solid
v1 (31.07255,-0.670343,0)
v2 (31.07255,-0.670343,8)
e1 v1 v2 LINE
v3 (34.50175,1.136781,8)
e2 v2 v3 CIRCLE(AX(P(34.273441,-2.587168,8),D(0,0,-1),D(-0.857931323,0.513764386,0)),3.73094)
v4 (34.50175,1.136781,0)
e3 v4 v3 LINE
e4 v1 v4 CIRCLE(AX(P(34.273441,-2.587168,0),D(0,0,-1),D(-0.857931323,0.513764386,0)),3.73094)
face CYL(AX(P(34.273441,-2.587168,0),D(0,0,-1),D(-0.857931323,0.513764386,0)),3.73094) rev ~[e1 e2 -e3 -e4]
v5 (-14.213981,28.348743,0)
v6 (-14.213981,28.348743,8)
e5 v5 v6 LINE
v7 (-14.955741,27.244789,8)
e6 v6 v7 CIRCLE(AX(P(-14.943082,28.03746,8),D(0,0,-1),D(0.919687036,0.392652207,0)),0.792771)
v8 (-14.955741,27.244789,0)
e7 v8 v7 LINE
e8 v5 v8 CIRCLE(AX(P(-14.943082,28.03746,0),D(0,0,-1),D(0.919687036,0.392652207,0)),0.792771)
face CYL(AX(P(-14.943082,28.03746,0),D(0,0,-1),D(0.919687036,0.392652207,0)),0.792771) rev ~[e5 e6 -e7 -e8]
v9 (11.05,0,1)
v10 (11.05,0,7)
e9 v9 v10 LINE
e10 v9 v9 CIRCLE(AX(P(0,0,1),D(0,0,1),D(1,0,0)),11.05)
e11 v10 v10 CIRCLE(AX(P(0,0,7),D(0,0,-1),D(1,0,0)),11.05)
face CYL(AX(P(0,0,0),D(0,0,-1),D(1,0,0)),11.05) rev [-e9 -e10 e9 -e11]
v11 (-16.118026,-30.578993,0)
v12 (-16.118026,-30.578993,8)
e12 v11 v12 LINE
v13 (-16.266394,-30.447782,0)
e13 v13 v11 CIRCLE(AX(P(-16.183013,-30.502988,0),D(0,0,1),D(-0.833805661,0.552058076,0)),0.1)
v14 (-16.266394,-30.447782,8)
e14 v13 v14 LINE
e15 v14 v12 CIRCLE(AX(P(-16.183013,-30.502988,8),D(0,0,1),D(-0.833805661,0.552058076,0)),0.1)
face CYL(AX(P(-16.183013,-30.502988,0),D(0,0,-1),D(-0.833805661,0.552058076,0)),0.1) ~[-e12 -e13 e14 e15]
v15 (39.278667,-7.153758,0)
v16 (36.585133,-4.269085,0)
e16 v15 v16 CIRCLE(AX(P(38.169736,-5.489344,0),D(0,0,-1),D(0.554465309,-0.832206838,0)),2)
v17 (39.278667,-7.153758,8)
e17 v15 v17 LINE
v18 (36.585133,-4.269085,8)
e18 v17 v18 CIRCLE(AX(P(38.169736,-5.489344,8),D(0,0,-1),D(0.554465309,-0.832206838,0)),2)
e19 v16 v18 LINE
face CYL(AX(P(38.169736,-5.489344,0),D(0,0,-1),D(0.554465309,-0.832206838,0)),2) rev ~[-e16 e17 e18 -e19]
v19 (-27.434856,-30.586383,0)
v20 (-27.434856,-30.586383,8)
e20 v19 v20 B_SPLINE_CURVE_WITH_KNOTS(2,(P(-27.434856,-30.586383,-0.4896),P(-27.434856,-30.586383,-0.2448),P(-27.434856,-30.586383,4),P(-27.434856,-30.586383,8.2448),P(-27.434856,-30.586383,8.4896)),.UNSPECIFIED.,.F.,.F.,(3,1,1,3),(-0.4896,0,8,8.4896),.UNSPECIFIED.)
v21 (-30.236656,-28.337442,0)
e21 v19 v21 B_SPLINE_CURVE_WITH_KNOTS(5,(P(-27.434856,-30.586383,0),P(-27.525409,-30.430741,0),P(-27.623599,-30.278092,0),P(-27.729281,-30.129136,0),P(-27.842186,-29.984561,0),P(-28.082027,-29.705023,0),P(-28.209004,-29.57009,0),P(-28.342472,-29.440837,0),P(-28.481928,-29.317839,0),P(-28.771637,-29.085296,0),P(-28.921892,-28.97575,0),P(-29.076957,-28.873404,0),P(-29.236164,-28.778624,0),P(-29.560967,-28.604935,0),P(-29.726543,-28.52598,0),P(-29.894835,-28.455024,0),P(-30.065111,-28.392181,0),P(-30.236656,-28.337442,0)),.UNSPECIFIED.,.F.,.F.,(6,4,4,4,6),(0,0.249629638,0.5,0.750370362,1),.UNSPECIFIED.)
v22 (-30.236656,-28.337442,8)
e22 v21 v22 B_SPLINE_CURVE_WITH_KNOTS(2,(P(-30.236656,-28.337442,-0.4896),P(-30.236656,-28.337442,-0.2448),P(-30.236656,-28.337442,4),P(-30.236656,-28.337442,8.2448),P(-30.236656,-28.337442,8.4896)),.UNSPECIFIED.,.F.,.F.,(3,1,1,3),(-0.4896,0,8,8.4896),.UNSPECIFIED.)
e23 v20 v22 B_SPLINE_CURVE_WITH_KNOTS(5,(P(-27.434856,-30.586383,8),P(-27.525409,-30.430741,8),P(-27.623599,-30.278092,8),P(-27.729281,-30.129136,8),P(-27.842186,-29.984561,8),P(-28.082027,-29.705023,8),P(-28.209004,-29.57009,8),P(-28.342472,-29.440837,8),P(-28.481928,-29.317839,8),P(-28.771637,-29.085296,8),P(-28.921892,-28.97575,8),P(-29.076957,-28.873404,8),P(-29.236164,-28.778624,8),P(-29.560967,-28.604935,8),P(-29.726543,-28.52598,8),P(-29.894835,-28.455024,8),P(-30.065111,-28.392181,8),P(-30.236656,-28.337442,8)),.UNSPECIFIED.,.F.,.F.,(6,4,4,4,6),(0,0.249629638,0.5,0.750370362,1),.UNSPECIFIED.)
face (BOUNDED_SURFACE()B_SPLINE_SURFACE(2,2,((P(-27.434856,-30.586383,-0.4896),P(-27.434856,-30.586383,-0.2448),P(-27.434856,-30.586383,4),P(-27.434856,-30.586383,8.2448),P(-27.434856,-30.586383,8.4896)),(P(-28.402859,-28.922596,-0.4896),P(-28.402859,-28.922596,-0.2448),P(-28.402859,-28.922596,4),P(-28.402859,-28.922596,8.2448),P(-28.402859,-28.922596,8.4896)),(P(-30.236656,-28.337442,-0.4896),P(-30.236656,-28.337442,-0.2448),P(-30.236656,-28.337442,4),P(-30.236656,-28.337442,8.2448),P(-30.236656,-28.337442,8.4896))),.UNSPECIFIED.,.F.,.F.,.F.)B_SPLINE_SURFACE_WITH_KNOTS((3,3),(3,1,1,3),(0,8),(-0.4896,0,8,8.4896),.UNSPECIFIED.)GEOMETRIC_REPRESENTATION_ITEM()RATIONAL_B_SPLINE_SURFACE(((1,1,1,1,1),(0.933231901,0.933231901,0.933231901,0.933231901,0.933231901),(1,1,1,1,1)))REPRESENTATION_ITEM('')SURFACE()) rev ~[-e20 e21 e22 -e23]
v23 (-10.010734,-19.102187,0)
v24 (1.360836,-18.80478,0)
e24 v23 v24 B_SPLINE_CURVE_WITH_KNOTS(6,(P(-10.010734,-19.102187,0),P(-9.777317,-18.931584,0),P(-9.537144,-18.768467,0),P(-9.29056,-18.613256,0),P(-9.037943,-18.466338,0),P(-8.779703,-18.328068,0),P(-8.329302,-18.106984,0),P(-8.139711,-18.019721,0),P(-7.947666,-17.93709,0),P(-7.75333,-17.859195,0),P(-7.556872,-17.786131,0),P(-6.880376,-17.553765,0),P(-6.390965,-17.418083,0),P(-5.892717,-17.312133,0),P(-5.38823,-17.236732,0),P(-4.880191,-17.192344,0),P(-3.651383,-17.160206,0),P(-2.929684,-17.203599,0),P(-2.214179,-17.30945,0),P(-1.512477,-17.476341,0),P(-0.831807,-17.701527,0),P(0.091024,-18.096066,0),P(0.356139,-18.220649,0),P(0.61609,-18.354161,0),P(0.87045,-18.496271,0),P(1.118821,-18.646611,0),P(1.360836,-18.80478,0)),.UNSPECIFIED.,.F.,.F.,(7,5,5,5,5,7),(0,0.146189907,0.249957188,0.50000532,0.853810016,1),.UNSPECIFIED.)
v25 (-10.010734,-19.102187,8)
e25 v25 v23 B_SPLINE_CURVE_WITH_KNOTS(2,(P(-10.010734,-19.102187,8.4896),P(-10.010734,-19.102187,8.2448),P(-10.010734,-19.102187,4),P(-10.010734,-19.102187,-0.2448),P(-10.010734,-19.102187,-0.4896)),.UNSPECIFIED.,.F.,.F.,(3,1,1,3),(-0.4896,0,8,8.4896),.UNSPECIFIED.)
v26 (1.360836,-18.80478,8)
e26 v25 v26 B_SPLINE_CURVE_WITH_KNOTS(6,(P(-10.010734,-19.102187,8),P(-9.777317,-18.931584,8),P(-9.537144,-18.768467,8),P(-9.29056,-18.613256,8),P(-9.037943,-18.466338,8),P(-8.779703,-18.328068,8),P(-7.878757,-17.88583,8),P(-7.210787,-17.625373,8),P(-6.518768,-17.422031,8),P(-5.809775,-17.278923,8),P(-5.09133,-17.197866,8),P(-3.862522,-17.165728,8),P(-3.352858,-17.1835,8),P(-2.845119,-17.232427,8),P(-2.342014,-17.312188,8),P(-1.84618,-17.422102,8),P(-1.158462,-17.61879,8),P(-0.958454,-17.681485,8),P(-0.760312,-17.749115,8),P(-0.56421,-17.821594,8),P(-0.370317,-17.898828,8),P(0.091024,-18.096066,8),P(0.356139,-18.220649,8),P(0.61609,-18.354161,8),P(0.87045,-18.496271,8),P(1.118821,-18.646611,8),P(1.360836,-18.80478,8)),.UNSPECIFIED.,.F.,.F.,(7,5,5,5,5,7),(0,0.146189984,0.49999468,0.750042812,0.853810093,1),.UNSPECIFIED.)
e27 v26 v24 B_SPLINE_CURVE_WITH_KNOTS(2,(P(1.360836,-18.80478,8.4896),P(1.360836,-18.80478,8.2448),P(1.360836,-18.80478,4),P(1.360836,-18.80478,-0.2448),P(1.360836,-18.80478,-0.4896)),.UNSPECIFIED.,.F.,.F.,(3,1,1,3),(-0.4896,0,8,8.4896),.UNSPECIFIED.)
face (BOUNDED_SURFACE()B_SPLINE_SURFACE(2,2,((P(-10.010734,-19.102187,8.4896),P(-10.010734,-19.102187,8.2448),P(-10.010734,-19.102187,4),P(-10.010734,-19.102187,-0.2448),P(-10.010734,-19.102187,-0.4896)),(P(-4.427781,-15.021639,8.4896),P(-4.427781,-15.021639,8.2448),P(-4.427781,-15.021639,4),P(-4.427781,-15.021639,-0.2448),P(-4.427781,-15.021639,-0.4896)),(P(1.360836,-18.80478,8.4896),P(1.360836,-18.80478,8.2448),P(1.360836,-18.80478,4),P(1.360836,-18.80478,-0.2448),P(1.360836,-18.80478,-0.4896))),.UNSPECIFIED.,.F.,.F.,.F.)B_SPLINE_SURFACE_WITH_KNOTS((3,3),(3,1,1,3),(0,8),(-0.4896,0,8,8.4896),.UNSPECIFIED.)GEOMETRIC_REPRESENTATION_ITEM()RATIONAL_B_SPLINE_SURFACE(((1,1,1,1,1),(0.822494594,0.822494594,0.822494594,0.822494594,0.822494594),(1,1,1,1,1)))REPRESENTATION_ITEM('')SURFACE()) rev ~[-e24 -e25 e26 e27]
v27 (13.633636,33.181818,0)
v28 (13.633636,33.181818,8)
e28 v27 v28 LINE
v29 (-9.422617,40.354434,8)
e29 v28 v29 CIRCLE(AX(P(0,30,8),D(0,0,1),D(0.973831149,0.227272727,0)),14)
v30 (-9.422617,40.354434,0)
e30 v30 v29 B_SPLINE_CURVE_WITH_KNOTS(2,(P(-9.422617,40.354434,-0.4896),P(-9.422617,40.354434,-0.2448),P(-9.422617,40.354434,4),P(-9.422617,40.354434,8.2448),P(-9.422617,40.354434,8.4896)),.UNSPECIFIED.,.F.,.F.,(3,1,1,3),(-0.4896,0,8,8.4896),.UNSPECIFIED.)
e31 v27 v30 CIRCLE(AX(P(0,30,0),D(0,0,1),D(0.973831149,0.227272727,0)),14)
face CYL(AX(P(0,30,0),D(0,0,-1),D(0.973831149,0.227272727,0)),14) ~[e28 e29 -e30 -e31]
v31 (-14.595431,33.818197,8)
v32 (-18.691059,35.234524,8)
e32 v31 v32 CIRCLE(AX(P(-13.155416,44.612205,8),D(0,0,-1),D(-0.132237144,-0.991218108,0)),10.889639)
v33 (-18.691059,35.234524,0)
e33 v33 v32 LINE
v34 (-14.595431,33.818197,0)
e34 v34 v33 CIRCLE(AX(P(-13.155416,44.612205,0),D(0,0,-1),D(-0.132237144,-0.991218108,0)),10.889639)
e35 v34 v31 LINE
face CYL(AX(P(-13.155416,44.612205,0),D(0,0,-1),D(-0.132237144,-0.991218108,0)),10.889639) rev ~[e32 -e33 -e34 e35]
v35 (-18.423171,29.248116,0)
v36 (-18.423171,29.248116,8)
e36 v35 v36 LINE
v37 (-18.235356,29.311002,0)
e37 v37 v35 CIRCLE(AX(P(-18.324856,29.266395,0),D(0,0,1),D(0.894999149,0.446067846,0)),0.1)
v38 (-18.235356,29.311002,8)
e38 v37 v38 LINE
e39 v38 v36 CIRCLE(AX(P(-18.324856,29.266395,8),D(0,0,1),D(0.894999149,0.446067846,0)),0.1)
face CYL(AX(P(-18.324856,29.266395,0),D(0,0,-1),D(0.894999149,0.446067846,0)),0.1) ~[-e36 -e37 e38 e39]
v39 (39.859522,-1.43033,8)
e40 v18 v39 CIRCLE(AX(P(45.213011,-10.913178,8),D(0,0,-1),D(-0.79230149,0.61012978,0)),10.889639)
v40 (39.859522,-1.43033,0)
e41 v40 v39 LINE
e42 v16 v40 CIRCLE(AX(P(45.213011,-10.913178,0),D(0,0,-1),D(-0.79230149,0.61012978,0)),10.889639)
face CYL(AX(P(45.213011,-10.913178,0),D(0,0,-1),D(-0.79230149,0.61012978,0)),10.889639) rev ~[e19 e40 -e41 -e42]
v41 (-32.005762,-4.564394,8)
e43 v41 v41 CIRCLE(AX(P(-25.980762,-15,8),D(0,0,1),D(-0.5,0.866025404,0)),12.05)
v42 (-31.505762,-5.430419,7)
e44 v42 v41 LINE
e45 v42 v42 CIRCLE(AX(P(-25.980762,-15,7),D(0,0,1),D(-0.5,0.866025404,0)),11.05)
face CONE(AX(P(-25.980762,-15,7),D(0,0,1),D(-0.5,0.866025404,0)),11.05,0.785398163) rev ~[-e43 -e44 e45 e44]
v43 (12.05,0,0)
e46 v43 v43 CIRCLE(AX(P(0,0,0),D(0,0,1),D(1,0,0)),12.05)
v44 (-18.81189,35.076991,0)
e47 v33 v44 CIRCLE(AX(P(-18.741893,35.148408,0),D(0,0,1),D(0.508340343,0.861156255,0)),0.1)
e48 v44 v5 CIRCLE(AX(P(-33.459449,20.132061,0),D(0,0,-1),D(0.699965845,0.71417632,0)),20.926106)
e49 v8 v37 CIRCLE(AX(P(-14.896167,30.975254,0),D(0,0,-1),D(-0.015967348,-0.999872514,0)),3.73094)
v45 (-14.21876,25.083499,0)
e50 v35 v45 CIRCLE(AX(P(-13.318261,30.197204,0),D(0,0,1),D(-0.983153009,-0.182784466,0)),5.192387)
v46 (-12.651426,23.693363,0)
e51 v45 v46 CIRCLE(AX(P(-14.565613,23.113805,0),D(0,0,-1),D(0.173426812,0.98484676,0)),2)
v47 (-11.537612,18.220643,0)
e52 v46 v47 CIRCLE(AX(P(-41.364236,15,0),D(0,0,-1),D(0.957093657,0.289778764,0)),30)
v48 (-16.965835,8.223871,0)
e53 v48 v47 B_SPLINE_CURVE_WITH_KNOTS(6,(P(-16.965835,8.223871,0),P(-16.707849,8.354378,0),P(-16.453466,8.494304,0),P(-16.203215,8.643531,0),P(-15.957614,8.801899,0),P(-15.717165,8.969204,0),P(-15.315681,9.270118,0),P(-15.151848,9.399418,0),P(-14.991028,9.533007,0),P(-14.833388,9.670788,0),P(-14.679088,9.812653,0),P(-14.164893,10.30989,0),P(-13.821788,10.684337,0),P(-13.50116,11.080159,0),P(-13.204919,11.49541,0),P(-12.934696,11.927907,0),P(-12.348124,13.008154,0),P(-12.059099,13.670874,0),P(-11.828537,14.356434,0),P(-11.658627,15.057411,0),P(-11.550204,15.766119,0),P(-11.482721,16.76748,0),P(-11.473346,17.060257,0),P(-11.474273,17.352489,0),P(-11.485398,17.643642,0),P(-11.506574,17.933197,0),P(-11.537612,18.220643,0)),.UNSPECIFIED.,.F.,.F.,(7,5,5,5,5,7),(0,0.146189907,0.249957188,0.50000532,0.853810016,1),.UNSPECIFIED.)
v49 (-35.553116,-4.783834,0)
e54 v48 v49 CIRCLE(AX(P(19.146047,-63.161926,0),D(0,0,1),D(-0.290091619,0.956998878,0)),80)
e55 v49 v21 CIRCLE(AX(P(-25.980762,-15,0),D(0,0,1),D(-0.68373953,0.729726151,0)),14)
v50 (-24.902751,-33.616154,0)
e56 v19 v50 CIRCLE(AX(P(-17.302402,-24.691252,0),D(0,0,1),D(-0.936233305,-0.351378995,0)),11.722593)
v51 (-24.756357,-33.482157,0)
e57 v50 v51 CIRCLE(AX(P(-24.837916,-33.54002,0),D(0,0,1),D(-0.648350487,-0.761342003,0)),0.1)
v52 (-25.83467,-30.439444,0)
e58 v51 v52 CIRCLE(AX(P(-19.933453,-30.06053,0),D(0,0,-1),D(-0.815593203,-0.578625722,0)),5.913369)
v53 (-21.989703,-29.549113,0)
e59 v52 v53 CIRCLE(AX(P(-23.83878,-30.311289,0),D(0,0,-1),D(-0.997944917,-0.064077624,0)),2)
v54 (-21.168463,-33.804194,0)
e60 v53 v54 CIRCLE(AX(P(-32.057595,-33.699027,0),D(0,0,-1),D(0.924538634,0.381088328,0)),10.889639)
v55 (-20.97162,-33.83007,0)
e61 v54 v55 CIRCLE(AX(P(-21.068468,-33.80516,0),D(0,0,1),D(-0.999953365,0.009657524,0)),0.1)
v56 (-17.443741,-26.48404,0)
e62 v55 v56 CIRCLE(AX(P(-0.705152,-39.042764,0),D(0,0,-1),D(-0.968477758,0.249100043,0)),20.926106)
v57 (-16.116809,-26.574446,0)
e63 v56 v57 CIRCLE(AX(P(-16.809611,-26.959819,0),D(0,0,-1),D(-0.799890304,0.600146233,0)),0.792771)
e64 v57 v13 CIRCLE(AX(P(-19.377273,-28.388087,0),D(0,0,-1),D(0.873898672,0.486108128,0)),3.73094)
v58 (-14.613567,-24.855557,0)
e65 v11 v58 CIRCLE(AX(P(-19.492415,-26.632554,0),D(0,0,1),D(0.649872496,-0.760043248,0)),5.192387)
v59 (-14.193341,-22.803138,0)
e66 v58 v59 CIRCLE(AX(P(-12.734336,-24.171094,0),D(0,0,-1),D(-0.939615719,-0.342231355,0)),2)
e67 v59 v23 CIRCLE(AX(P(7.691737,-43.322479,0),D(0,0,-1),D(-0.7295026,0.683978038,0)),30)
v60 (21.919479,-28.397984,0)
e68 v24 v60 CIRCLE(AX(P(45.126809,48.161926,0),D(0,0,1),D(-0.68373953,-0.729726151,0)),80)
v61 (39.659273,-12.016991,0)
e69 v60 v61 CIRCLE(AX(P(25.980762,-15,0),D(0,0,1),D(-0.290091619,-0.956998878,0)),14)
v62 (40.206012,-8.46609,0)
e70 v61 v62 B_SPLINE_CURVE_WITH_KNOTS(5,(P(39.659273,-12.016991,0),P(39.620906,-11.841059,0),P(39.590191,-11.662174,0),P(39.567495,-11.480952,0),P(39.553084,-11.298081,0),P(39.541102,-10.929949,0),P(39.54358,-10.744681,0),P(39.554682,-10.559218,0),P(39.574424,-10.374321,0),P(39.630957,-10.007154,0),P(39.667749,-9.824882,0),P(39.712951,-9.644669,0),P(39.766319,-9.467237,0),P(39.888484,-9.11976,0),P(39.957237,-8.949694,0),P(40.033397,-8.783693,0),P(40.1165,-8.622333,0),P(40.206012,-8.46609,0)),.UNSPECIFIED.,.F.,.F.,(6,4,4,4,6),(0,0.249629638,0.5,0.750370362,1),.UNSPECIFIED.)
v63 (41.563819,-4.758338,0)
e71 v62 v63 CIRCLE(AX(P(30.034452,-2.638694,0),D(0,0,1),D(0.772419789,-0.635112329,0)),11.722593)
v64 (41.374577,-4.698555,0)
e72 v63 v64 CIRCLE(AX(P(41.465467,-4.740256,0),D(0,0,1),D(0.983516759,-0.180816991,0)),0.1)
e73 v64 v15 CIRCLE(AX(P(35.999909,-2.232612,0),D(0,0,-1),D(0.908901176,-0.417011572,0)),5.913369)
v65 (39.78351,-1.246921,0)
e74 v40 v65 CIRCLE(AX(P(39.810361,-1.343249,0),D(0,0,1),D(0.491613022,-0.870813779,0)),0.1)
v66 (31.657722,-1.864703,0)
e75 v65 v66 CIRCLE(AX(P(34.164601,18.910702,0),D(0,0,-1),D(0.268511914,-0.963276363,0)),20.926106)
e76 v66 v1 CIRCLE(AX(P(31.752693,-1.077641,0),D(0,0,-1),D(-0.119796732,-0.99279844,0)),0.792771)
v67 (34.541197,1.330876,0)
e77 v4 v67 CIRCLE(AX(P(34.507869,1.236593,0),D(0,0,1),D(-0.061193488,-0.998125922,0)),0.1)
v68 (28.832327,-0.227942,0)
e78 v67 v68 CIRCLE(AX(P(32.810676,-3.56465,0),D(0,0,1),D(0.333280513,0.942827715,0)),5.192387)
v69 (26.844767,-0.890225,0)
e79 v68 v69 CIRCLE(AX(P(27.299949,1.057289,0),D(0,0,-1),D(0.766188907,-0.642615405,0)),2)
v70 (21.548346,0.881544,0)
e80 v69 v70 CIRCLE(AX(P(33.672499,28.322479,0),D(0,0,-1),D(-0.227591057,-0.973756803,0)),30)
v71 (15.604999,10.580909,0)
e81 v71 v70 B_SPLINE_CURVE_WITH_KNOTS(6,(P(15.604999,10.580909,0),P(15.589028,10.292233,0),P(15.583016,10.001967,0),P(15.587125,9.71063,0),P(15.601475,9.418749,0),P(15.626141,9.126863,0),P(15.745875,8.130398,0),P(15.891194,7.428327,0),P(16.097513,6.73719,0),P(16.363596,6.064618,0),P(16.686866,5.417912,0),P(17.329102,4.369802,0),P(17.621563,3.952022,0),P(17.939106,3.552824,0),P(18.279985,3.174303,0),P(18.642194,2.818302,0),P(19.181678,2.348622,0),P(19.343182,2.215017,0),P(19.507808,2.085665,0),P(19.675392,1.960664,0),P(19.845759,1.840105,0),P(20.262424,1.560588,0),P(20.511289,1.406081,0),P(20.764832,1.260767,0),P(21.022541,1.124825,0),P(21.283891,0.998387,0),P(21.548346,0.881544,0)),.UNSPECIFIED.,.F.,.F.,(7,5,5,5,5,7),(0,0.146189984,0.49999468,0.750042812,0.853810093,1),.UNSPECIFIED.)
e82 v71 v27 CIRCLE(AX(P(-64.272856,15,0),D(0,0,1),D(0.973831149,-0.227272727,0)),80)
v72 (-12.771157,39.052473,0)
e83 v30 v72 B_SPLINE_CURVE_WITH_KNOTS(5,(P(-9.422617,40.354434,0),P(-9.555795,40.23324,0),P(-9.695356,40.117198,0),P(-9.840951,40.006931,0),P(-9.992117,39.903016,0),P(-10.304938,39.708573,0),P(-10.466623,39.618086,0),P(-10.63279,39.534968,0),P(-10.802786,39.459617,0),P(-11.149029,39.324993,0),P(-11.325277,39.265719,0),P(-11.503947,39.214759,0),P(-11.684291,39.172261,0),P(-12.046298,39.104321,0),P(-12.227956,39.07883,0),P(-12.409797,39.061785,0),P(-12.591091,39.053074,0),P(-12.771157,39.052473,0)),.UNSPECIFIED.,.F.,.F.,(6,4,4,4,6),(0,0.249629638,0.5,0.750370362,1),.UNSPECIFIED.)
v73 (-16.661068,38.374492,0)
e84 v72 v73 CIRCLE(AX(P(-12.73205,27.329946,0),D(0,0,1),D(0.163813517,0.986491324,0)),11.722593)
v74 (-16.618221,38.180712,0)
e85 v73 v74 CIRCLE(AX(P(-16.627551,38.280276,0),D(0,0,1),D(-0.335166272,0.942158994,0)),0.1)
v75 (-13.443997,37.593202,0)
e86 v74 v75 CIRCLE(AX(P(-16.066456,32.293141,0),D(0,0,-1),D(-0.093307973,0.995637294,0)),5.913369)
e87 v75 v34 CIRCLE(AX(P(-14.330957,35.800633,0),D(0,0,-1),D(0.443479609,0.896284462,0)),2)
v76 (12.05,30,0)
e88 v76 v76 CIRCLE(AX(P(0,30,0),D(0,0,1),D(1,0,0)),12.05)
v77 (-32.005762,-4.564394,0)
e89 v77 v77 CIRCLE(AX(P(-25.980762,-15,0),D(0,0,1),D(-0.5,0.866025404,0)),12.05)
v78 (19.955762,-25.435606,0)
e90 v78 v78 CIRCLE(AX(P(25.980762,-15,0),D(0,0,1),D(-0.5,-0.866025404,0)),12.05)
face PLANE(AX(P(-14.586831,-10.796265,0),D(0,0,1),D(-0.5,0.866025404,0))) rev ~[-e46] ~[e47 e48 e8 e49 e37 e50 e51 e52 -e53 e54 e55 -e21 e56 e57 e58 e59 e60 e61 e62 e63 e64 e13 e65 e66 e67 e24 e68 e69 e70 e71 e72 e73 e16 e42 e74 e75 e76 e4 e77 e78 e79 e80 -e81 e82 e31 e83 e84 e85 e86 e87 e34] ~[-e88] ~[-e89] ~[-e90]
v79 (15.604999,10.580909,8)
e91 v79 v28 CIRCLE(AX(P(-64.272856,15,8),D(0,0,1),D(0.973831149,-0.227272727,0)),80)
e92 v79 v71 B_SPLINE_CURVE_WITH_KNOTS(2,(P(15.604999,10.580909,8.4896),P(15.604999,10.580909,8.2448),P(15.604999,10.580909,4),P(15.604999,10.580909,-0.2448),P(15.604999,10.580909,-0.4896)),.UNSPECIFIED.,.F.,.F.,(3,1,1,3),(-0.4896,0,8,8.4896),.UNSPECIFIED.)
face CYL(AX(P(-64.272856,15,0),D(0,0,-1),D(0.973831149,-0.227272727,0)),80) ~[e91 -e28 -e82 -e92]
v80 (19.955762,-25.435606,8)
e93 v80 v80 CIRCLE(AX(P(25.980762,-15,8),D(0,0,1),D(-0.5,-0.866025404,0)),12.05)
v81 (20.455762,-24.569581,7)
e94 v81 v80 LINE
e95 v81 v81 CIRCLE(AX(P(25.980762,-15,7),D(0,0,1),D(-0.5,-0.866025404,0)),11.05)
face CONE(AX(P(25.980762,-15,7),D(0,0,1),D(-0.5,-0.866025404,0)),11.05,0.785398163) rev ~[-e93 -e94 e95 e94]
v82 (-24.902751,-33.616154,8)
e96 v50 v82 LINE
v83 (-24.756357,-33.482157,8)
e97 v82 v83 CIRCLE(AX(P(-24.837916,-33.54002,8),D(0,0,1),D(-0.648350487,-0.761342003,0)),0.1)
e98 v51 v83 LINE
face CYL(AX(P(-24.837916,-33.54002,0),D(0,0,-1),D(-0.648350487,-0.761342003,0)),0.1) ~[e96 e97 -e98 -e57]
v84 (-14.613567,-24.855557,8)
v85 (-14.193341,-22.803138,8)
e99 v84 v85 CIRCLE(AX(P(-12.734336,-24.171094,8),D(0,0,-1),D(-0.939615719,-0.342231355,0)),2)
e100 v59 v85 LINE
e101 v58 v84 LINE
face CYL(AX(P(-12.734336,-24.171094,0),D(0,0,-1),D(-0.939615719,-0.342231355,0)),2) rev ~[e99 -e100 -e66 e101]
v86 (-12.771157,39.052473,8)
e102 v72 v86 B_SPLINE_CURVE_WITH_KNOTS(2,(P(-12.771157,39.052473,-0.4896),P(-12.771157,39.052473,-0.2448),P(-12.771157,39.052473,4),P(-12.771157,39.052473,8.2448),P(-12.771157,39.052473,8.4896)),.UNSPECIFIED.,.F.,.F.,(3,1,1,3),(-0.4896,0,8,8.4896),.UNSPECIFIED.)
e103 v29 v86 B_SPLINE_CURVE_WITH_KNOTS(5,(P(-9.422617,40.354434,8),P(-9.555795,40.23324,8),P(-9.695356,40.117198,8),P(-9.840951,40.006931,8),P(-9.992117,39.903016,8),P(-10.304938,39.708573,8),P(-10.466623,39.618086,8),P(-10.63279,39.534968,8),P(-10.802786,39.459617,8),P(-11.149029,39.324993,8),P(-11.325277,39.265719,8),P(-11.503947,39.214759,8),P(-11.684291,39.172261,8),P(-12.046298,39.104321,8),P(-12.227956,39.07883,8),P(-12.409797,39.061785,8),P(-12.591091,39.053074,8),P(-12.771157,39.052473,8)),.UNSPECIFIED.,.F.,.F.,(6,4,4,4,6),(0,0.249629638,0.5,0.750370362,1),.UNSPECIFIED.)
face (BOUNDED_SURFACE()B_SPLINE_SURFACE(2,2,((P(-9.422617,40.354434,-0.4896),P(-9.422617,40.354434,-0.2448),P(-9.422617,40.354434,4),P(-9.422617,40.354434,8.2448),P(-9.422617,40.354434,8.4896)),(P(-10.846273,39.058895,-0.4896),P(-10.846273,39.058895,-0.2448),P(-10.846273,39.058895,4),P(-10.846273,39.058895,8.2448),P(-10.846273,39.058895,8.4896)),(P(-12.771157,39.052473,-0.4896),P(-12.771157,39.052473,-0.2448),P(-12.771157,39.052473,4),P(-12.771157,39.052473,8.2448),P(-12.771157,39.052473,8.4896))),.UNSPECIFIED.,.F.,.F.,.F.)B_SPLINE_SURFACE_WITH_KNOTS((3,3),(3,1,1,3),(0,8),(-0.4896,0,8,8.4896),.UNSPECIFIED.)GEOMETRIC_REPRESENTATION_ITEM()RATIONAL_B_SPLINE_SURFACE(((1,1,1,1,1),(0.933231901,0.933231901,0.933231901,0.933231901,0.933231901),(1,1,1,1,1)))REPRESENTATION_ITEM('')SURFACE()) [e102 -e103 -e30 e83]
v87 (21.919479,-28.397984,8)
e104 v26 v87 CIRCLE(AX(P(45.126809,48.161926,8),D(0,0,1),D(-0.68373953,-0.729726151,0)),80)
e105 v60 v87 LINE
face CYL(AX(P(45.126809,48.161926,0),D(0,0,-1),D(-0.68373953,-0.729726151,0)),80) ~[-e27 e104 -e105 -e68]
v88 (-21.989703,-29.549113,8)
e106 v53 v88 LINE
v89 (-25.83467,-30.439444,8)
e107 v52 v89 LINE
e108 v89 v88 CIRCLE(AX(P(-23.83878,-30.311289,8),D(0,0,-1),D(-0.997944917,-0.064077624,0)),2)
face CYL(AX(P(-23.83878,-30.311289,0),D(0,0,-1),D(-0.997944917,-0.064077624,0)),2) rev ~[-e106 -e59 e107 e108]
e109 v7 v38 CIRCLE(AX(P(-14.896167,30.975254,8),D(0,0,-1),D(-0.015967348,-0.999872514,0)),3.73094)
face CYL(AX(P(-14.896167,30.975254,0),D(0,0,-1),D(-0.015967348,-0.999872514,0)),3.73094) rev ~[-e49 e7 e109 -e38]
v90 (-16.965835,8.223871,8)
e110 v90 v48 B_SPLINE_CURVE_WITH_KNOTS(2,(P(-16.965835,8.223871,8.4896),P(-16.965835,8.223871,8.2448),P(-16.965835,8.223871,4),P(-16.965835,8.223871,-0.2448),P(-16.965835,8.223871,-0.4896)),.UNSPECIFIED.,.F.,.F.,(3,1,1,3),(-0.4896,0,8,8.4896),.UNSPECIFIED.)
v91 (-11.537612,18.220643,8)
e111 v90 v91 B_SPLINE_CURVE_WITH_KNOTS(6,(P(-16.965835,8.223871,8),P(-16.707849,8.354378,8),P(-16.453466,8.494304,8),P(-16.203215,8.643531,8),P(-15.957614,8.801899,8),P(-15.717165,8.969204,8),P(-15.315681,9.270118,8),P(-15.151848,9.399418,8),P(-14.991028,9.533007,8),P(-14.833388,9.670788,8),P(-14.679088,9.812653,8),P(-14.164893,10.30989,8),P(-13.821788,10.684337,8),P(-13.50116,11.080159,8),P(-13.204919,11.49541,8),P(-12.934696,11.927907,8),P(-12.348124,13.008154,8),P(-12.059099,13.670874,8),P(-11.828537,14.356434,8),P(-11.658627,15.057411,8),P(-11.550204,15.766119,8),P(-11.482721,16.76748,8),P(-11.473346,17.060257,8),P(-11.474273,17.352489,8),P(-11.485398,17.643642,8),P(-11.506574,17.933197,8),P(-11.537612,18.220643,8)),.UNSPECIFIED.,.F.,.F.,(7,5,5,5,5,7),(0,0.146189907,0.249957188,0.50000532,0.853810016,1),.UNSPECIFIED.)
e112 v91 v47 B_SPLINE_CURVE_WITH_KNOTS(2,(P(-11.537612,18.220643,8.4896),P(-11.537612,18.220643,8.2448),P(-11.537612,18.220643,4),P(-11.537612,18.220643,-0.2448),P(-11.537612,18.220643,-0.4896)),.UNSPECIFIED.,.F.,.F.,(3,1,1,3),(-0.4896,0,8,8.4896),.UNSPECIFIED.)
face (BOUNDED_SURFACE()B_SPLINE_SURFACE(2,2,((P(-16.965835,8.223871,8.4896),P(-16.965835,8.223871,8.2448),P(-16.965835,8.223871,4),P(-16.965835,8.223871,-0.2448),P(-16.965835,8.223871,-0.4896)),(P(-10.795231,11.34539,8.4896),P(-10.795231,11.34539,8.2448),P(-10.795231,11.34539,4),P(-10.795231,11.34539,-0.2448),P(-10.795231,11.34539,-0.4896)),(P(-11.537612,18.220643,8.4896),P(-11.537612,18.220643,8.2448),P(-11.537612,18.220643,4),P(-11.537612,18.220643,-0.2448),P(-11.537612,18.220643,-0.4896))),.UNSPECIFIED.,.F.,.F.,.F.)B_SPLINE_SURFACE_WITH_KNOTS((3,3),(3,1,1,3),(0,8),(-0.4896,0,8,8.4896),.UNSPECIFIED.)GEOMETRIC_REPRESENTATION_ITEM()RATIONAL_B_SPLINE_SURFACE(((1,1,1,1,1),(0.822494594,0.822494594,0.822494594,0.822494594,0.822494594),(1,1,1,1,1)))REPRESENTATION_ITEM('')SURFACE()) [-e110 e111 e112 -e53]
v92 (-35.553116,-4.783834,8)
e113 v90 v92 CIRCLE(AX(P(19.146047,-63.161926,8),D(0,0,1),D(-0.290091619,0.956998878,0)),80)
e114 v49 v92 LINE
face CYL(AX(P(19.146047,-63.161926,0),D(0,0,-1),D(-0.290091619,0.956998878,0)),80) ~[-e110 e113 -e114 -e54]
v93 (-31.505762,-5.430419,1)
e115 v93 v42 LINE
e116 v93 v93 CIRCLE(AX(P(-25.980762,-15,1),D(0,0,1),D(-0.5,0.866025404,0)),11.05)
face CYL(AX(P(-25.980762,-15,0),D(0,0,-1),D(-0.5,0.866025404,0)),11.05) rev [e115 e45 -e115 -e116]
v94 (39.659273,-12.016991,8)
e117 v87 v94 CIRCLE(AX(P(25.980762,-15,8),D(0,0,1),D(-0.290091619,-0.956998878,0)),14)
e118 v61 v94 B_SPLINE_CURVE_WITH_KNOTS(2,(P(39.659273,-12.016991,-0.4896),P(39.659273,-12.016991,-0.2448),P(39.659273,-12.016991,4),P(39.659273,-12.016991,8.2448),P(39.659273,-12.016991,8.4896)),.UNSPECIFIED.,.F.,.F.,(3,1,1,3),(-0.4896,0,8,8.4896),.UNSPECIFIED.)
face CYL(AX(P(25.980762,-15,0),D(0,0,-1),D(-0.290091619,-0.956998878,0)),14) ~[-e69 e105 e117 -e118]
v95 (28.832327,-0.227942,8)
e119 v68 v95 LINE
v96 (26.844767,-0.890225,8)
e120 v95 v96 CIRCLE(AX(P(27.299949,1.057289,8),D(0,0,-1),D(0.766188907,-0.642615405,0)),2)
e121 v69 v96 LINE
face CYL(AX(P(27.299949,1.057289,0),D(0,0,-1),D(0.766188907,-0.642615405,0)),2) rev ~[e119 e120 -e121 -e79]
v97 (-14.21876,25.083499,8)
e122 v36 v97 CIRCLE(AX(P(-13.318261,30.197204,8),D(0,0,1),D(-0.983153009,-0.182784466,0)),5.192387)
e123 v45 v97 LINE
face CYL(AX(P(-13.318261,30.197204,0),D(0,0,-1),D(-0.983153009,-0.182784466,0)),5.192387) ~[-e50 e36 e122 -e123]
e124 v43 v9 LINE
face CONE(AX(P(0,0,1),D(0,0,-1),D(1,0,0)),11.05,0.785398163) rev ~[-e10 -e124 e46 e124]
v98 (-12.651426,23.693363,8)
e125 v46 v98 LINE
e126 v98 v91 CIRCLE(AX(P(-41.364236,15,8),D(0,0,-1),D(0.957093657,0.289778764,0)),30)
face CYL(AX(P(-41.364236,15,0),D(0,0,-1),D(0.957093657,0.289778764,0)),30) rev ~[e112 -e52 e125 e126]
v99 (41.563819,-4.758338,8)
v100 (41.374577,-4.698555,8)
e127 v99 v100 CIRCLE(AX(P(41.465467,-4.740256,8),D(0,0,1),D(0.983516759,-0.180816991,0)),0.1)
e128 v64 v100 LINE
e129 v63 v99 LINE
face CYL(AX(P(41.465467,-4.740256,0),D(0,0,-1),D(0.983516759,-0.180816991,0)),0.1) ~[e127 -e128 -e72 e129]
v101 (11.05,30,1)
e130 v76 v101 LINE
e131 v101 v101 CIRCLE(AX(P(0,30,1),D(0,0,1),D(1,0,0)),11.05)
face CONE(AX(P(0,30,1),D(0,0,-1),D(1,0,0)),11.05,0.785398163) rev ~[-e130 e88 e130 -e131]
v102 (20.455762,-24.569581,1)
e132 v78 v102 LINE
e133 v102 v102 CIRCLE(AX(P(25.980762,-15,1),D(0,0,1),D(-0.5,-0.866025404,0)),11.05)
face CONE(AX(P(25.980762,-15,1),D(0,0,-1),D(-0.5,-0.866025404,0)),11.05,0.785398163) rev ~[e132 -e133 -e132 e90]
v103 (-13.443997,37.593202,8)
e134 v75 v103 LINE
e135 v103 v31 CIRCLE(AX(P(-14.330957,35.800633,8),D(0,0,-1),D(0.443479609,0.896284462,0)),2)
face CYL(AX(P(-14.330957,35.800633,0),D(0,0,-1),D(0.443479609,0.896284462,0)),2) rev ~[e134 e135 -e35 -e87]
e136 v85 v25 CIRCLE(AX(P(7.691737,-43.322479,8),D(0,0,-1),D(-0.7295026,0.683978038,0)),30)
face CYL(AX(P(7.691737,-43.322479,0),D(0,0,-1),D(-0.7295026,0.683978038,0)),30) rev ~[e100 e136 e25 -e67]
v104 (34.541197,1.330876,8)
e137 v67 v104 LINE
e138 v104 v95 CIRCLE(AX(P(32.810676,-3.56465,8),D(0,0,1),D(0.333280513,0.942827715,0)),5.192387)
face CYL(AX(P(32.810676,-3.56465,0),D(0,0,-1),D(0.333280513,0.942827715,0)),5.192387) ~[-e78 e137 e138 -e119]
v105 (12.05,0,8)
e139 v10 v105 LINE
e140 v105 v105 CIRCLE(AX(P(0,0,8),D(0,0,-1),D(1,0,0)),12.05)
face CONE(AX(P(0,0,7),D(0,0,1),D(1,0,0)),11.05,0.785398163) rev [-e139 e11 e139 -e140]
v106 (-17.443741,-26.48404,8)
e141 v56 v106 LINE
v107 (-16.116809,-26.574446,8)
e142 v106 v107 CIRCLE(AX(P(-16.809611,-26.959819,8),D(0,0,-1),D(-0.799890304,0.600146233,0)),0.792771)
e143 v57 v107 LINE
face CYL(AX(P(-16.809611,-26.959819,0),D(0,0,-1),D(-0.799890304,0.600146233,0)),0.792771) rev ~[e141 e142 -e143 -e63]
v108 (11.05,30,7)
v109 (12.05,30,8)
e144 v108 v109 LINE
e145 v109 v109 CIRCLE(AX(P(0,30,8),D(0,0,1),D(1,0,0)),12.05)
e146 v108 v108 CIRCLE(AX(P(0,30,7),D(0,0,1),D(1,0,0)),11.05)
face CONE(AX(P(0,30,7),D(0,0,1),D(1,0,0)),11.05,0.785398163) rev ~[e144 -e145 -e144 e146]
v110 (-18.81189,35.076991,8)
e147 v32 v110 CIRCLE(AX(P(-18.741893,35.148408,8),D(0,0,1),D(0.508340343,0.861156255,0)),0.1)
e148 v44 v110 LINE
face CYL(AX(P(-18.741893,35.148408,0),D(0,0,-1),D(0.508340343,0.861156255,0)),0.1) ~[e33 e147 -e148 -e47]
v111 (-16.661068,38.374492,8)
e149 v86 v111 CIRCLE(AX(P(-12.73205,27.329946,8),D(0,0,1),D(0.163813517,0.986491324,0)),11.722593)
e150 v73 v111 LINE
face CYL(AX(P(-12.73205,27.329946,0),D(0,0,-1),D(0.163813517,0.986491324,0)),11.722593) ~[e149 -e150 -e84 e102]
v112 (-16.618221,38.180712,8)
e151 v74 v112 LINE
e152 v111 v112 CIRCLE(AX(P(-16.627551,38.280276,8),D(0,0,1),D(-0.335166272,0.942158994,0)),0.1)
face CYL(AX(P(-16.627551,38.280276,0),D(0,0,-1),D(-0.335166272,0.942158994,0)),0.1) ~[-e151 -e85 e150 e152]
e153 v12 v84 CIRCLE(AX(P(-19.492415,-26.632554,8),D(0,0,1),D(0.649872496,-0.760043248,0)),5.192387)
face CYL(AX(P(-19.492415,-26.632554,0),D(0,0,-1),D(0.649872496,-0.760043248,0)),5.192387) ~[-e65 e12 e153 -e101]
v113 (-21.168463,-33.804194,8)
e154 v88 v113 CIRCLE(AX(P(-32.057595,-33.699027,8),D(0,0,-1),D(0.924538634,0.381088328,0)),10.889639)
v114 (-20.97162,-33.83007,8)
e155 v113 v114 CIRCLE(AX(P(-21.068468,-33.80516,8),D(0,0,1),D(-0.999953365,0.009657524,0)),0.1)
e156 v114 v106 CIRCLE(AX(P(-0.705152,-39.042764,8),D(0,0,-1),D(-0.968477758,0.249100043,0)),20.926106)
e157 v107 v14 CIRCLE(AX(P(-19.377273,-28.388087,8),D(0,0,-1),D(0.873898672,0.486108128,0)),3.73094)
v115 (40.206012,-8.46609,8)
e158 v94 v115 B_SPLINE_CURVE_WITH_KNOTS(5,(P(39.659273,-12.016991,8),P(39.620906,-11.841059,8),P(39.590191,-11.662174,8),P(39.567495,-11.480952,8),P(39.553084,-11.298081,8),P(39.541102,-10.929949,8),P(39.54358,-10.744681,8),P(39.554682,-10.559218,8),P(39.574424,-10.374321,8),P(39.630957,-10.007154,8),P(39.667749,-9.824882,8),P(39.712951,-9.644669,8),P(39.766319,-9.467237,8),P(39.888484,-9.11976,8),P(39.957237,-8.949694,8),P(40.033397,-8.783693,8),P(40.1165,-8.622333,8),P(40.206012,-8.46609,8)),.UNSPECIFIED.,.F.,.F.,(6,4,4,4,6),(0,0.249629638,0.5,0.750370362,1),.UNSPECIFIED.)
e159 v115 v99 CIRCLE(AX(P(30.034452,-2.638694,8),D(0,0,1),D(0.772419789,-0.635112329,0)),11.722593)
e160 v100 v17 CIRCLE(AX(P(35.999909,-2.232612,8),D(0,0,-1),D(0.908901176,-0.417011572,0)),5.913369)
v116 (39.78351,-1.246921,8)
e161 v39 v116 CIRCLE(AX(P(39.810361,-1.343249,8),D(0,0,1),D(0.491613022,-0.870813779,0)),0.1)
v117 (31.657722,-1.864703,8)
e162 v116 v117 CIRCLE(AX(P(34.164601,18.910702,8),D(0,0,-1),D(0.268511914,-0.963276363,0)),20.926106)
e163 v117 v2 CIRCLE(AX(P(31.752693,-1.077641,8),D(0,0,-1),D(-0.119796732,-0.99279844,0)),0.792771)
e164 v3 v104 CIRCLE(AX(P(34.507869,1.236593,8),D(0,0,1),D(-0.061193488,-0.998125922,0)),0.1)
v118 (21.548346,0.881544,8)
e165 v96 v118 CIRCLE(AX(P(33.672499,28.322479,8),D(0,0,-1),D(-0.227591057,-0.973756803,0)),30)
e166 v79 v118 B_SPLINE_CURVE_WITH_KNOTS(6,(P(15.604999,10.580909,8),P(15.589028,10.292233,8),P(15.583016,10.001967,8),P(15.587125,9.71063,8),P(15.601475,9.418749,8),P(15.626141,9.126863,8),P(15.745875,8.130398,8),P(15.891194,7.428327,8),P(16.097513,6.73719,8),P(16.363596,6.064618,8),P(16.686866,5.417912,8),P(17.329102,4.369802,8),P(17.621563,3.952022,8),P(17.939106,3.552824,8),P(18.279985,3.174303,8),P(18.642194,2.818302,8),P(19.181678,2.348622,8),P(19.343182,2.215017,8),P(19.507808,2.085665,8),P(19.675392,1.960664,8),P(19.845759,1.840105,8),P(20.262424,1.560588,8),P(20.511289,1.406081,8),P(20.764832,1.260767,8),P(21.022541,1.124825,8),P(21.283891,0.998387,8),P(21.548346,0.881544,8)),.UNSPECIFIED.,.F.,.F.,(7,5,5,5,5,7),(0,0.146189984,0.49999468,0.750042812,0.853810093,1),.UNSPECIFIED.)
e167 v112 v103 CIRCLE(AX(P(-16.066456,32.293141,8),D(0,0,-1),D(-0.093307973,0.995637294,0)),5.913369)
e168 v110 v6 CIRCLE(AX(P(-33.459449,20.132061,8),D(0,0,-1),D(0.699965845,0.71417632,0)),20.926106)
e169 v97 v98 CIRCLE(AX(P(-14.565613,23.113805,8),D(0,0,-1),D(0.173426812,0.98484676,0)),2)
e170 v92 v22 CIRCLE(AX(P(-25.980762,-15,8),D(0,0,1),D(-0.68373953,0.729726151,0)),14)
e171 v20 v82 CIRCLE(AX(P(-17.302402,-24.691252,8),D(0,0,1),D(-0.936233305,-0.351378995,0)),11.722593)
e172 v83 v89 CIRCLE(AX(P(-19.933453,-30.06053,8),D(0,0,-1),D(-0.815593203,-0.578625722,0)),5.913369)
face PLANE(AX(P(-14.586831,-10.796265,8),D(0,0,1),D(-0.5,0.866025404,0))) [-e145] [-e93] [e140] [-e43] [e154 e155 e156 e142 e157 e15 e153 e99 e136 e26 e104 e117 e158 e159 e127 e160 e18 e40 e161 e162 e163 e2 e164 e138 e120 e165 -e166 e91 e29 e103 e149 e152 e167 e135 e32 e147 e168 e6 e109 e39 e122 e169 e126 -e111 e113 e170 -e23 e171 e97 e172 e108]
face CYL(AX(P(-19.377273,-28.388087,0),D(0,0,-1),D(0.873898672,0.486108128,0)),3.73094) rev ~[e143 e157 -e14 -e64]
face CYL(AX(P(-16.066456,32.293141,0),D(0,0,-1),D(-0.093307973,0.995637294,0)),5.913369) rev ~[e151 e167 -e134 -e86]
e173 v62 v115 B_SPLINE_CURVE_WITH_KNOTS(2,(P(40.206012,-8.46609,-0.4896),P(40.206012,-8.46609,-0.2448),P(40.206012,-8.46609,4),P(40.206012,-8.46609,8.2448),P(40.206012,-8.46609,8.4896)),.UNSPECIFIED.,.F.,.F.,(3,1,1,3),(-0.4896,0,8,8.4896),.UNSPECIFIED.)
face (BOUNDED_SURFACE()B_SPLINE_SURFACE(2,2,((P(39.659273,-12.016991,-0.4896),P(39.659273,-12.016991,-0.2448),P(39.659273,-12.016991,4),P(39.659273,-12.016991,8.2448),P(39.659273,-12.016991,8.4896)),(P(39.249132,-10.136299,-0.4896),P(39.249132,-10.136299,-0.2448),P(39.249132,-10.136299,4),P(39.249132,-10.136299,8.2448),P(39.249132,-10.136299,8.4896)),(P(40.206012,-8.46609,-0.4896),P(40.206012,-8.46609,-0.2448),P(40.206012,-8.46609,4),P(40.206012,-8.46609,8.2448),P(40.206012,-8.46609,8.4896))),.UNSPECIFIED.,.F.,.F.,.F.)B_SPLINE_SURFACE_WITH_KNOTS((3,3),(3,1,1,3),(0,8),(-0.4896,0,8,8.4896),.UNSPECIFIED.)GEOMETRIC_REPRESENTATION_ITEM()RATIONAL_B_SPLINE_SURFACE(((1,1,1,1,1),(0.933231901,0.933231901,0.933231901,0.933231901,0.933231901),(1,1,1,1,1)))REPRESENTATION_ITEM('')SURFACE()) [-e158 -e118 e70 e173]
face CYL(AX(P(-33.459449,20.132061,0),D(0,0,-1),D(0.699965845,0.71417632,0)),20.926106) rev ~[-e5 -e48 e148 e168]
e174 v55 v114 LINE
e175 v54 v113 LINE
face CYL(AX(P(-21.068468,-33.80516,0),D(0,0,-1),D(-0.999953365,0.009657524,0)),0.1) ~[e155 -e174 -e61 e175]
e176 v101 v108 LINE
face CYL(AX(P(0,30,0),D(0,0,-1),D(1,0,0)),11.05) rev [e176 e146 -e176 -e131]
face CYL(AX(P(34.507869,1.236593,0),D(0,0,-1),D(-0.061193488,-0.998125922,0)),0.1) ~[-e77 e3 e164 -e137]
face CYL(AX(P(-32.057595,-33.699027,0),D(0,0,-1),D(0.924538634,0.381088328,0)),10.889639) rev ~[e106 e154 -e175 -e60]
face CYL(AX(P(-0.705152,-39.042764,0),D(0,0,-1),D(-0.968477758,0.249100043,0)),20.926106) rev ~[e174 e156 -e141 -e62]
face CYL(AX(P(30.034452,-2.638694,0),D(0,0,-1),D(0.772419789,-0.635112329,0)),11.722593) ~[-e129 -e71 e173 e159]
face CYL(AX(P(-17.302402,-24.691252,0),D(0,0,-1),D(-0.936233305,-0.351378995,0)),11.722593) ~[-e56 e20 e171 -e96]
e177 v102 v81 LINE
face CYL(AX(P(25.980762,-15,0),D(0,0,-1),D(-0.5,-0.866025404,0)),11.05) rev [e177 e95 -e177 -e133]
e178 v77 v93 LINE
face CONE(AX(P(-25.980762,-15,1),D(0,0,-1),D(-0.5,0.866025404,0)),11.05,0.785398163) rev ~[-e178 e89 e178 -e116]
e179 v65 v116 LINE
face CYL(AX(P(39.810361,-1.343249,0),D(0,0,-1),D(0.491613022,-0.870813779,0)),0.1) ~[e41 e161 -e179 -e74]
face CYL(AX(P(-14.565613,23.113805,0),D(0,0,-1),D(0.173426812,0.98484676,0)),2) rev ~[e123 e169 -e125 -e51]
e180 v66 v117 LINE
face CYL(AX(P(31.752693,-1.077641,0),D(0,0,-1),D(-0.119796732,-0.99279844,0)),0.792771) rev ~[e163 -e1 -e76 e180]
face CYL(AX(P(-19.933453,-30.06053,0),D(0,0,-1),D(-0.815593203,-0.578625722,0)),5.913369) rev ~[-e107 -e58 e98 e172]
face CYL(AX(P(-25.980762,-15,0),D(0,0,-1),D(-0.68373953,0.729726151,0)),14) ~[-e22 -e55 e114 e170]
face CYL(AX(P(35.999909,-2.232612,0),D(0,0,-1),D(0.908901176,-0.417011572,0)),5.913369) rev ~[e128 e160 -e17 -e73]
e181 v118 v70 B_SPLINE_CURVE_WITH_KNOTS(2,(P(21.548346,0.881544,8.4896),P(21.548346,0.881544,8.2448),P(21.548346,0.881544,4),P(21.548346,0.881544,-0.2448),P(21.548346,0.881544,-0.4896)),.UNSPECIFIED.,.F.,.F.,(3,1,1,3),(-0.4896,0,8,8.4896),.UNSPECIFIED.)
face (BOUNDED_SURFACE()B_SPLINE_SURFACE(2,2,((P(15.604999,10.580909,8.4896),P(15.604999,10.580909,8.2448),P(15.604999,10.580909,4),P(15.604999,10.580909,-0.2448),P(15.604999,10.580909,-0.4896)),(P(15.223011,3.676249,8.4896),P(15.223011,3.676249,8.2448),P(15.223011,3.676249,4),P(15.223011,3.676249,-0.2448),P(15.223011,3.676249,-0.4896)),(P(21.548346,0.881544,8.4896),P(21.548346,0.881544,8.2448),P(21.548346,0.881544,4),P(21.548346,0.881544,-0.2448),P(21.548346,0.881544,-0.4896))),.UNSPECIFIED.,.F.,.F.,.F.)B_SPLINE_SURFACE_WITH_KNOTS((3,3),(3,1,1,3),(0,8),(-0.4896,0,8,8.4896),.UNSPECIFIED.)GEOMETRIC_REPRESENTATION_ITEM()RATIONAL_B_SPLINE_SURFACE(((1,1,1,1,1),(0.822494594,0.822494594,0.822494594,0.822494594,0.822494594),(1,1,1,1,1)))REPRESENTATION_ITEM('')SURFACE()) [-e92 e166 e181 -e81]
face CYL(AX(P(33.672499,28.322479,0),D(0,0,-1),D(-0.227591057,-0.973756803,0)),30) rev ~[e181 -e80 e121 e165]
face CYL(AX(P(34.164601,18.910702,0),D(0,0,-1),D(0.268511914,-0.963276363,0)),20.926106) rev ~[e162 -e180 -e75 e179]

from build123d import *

# Parameters (mm, degrees)
F0_R     = 11.05
F1_DEPTH = 8
F2_COUNT = 3
F3_R     = 10
F4_R     = 5
F5_SIZE  = 1


with BuildPart() as f1:
    # F0 (on Top) → F1 (new body)
    with BuildSketch(Plane.XY):
        with BuildLine():
            ThreePointArc((-12.6514260567, 23.6933629251), (-11.3751248169, 14.1917767316), (-13.1613477418, 4.7727272727))
            ThreePointArc((-13.1613477418, 4.7727272727), (-3.9842769003, -13.421085559), (13.6336360909, -3.1818181818))
            ThreePointArc((13.6336360909, -3.1818181818), (15.7271441431, 15), (13.6336360909, 33.1818181818))
            ThreePointArc((13.6336360909, 33.1818181818), (3.1856807408, 43.6327340698), (-10.8117310602, 38.8941818894))
            ThreePointArc((-10.8117310602, 38.8941818894), (-13.7694685953, 39.0065439815), (-16.6610679634, 38.374492037))
            ThreePointArc((-16.6610679634, 38.374492037), (-16.7251928987, 38.2586862032), (-16.6182205389, 38.1807124082))
            ThreePointArc((-16.6182205389, 38.1807124082), (-14.990242489, 38.1077523786), (-13.4439973475, 37.5932024207))
            ThreePointArc((-13.4439973475, 37.5932024207), (-12.4179647139, 35.2171421288), (-14.5954308534, 33.8181972809))
            ThreePointArc((-14.5954308534, 33.8181972809), (-16.7144110874, 34.3205676404), (-18.6910590274, 35.2345239477))
            ThreePointArc((-18.6910590274, 35.2345239477), (-18.82124029, 35.2092689611), (-18.8118896462, 35.0769906902))
            ThreePointArc((-18.8118896462, 35.0769906902), (-16.1822484317, 31.9388495716), (-14.2139807274, 28.3487430493))
            ThreePointArc((-14.2139807274, 28.3487430493), (-14.2850540536, 27.5953224844), (-14.9557406683, 27.2447894188))
            ThreePointArc((-14.9557406683, 27.2447894188), (-16.8849368279, 27.8185608598), (-18.2353559933, 29.311001668))
            ThreePointArc((-18.2353559933, 29.311001668), (-18.3566059607, 29.361220693), (-18.4231712091, 29.2481164368))
            ThreePointArc((-18.4231712091, 29.2481164368), (-16.9723331855, 26.5082159897), (-14.218759745, 25.0834989167))
            ThreePointArc((-14.218759745, 25.0834989167), (-13.2385127521, 24.6100687257), (-12.6514260567, 23.6933629251))
        make_face()
        Circle(F0_R, mode=Mode.SUBTRACT)
        with Locations((0, 30)):
            Circle(F0_R, mode=Mode.SUBTRACT)
    extrude(amount=F1_DEPTH)

    # F2: F1 ×3 about axis
    f2_axis = Axis((0, 0, 0), (0, 0, -1))


with BuildPart() as f1_1:
    add(f1.part)
    for i in range(1, F2_COUNT):
        add(f1.part.rotate(f2_axis, i * 360 / F2_COUNT))

    # F3
    f3_edges = [f1_1.edges().sort_by_distance(p)[0] for p in [
        (15.072251, 4.78462, 4),
        (-3.392523, -15.445263, 4),
        (-11.679728, 10.660642, 4),
    ]]
    fillet(f3_edges, radius=F3_R)

    # F4
    f4_edges = [f1_1.edges().sort_by_distance(p)[0] for p in [
        (-28.277484, -28.810325, 4),
        (39.089215, -10.083857, 4),
        (-10.811731, 38.894182, 4),
    ]]
    fillet(f4_edges, radius=F4_R)

    # F5
    f5_edges = [f1_1.edges().sort_by_distance(p)[0] for p in [
        (-11.05, 30, 8),
        (-11.05, 30, 0),
        (-11.05, 0, 8),
        (-11.05, 0, 0),
        (31.505762, -5.430419, 8),
        (31.505762, -5.430419, 0),
        (-20.455762, -24.569581, 8),
        (-20.455762, -24.569581, 0),
    ]]
    chamfer(f5_edges, length=F5_SIZE)


solid = f1_1.part
